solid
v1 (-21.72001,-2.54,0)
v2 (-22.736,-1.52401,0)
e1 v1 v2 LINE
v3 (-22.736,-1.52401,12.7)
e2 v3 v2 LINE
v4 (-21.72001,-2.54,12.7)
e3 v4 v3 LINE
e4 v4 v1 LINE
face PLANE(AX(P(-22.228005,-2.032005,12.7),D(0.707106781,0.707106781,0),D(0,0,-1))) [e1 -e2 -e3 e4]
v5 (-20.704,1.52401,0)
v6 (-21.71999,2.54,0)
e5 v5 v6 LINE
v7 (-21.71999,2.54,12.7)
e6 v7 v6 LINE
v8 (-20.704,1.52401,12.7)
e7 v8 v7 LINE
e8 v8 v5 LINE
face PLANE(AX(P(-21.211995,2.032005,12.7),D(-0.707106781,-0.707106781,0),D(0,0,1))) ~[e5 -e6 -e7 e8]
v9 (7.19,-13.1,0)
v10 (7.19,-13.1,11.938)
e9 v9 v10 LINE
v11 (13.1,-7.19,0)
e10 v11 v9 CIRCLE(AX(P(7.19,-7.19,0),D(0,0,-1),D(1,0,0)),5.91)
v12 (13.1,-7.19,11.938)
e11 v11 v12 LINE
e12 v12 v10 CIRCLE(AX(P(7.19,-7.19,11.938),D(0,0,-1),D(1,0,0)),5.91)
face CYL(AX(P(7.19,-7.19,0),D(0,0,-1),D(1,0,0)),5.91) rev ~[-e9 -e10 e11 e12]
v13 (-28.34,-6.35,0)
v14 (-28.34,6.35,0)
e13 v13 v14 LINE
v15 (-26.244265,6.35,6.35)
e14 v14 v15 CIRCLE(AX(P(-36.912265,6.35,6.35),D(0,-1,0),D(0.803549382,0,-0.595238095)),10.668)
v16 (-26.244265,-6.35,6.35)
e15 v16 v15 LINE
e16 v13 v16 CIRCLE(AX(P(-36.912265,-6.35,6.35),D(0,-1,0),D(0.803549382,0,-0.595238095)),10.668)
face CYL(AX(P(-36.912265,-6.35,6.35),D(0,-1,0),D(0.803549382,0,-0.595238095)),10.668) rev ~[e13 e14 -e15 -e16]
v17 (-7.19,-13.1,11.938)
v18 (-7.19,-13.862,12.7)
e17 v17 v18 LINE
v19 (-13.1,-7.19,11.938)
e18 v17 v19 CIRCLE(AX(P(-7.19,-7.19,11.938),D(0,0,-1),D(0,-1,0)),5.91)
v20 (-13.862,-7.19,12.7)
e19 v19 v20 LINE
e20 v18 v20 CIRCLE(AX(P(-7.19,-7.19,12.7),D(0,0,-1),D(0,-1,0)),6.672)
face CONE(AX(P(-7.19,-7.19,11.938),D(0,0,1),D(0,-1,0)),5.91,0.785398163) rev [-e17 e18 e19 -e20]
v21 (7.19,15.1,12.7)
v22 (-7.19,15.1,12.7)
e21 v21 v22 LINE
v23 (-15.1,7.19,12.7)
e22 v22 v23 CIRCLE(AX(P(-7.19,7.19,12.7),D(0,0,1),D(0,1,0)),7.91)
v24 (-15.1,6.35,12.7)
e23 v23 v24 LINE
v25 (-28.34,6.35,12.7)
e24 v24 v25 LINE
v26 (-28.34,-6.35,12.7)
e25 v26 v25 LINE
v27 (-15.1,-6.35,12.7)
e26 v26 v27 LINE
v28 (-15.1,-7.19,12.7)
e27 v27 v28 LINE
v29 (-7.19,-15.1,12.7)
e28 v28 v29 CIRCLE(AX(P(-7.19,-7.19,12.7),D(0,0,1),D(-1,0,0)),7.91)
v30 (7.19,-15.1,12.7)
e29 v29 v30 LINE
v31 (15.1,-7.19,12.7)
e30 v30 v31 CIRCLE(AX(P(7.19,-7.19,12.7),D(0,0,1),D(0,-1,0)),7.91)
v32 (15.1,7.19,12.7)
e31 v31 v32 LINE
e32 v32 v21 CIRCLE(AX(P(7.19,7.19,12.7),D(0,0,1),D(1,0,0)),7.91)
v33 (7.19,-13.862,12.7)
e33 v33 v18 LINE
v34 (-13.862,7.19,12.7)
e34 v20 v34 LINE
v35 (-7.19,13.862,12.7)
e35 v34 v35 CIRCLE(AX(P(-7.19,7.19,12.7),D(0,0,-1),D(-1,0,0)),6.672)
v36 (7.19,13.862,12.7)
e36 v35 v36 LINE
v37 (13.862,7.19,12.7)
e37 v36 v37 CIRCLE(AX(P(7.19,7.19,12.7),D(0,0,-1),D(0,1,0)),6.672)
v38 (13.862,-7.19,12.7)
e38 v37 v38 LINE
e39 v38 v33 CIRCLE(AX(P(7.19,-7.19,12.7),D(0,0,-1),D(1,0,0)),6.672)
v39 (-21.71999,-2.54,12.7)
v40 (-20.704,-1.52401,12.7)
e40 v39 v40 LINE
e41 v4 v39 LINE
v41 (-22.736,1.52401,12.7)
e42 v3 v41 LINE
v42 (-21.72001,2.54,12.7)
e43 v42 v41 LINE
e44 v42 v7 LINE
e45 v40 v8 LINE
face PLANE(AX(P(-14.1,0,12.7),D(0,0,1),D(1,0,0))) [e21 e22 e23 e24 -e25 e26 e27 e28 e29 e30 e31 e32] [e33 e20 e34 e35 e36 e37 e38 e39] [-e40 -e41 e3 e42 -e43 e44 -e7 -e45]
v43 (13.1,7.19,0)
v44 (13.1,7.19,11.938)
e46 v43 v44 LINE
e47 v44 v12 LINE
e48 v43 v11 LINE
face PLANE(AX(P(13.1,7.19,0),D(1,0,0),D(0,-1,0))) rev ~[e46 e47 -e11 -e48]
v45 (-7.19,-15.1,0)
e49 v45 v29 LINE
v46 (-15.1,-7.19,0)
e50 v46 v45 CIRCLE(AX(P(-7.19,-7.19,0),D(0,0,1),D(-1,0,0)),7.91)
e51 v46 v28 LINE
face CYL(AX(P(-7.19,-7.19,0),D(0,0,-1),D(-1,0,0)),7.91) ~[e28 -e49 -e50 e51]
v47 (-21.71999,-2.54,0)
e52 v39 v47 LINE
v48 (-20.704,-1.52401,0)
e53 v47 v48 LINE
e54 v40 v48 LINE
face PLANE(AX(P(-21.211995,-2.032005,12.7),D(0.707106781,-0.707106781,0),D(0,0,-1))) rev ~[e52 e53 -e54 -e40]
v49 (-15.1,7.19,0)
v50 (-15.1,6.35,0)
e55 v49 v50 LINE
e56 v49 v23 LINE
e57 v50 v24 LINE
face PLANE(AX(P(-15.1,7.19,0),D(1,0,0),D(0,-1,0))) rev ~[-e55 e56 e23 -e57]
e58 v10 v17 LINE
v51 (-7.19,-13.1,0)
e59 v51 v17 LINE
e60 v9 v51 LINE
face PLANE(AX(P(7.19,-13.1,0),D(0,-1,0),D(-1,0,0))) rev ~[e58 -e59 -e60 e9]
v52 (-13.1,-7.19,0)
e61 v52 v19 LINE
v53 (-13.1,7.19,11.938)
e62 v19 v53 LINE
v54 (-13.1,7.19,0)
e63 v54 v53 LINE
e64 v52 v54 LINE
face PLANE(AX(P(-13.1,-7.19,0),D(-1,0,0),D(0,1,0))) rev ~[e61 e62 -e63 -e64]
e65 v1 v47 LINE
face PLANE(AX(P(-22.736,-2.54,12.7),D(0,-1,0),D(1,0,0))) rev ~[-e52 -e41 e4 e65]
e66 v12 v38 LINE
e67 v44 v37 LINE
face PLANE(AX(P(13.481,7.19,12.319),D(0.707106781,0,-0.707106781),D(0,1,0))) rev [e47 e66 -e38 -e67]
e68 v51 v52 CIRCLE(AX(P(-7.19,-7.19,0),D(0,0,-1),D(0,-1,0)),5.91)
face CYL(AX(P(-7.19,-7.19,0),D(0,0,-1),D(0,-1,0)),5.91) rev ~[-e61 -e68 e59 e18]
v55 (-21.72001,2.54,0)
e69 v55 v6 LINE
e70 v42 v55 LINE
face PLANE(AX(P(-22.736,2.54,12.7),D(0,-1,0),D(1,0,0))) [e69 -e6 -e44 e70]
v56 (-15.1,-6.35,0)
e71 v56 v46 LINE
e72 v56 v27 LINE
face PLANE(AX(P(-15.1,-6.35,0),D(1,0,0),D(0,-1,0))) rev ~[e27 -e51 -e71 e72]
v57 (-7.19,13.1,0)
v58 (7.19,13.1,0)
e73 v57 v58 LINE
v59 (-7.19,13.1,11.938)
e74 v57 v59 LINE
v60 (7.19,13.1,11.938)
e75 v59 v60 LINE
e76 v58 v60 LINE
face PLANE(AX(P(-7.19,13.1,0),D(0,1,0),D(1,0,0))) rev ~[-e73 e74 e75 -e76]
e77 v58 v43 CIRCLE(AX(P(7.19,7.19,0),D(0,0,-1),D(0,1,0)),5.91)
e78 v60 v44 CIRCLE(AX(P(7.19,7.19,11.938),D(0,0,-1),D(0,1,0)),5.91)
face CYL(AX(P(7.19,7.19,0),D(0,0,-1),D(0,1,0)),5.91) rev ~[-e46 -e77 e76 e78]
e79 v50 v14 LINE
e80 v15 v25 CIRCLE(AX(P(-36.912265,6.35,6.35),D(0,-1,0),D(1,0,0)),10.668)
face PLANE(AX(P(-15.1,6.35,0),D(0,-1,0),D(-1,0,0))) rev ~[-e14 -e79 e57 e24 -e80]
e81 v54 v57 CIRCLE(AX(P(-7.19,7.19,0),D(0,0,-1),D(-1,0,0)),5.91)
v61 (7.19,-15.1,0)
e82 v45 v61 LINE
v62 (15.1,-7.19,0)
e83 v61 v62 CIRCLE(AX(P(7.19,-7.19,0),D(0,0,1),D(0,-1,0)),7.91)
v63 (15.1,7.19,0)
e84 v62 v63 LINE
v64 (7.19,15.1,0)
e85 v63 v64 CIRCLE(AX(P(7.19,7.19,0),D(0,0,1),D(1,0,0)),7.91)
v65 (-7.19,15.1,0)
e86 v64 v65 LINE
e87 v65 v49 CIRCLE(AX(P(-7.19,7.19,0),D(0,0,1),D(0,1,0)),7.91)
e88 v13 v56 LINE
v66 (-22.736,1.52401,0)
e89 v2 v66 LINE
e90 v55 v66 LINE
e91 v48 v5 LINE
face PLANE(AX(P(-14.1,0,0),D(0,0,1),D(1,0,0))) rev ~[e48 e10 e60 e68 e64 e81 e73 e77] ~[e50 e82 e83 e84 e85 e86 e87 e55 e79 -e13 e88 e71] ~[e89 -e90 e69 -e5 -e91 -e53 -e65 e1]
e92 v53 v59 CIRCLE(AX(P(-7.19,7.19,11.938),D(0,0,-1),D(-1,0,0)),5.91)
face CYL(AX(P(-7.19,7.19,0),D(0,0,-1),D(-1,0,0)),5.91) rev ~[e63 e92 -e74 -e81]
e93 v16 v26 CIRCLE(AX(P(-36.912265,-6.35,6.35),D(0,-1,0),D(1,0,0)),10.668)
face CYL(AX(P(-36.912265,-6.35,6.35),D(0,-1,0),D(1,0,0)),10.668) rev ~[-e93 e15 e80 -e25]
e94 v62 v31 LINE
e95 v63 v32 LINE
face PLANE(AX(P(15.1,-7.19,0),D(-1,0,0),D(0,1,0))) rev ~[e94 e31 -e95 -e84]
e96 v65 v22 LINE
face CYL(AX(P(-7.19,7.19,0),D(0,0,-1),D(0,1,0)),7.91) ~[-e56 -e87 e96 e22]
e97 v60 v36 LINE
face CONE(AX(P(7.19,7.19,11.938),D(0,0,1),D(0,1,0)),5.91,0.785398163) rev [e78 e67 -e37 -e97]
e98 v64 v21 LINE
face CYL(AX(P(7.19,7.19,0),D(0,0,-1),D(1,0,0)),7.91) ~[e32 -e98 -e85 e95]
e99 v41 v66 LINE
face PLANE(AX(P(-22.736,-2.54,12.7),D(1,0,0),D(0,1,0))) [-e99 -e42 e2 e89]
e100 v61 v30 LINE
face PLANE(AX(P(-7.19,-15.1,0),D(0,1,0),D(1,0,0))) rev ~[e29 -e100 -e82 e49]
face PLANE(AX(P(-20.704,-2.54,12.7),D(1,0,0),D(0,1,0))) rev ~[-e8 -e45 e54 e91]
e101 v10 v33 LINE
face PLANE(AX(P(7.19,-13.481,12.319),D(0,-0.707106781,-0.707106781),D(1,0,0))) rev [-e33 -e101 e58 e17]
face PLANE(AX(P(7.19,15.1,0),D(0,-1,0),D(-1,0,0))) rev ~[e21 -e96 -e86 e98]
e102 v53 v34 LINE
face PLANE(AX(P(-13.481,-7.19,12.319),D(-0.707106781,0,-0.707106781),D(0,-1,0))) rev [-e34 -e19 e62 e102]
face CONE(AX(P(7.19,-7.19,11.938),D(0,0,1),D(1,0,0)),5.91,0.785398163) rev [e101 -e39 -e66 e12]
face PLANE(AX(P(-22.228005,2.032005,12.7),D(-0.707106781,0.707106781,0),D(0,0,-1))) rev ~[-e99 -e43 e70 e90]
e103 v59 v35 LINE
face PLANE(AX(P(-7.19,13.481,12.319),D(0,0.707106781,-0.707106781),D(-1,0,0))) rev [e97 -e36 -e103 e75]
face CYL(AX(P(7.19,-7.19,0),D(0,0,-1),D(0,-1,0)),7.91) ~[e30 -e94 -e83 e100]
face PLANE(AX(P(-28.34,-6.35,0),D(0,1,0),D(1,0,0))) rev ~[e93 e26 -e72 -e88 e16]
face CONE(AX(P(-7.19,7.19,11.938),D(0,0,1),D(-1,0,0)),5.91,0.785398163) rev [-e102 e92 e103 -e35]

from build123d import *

# Parameters (mm, degrees)
F0_W     = 2
F0_H     = 12.7
F0_W_2   = 13.24
F1_DEPTH = 12.7
F3_DEPTH = 12.7
F4_W     = 2.032
F4_H     = 5.08
F5_DEPTH = 12.7
F6_SIZE  = 1.01599
F7_SIZE  = 0.762


# Not quite as in the source:
# - a fillet or chamfer is up to 0.001 mm smaller than in the source, because OpenCascade refuses the exact size


with BuildPart() as f1:
    # F0 (on Top) → F1 (new body)
    with BuildSketch(Plane.XY):
        with Locations((-14.1, 0)):
            Rectangle(F0_W, F0_H)
        with Locations((-21.72, 0)):
            Rectangle(F0_W_2, F0_H)
        with BuildLine():
            ThreePointArc((7.19, 13.1), (11.3690010768, 11.3690010768), (13.1, 7.19))
            Line((13.1, 7.19), (13.1, -7.19))
            ThreePointArc((13.1, -7.19), (11.3690010768, -11.3690010768), (7.19, -13.1))
            Line((7.19, -13.1), (-7.19, -13.1))
            ThreePointArc((-7.19, -13.1), (-11.3690010768, -11.3690010768), (-13.1, -7.19))
            Line((-13.1, -7.19), (-13.1, -6.35))
            Line((-13.1, -6.35), (-15.1, -6.35))
            Line((-15.1, -6.35), (-15.1, -7.19))
            ThreePointArc((-15.1, -7.19), (-12.7832146392, -12.7832146392), (-7.19, -15.1))
            Line((-7.19, -15.1), (7.19, -15.1))
            ThreePointArc((7.19, -15.1), (12.7832146392, -12.7832146392), (15.1, -7.19))
            Line((15.1, -7.19), (15.1, 7.19))
            ThreePointArc((15.1, 7.19), (12.7832146392, 12.7832146392), (7.19, 15.1))
            Line((7.19, 15.1), (-7.19, 15.1))
            ThreePointArc((-7.19, 15.1), (-12.7832146392, 12.7832146392), (-15.1, 7.19))
            Line((-15.1, 7.19), (-15.1, 6.35))
            Line((-15.1, 6.35), (-13.1, 6.35))
            Line((-13.1, 6.35), (-13.1, 7.19))
            ThreePointArc((-13.1, 7.19), (-11.3690010768, 11.3690010768), (-7.19, 13.1))
            Line((-7.19, 13.1), (7.19, 13.1))
        make_face()
    extrude(amount=F1_DEPTH)

    # F2 (on face) → F3 (cut, through all)
    with BuildSketch(Plane.XZ.offset(6.35)):
        with BuildLine():
            ThreePointArc((-28.34, 0), (-26.7817380481, 3.0065509582), (-26.2442648116, 6.35))
            ThreePointArc((-26.2442648116, 6.35), (-26.7817380481, 9.6934490418), (-28.34, 12.7))
            Line((-28.34, 12.7), (-28.34, 0))
        make_face()
    extrude(amount=-F3_DEPTH, mode=Mode.SUBTRACT)

    # F4 (on face) → F5 (cut, through all)
    with BuildSketch(Plane.XY.offset(12.7)):
        with Locations((-21.72, 0)):
            Rectangle(F4_W, F4_H)
    extrude(amount=-F5_DEPTH, mode=Mode.SUBTRACT)

    # F6 (size 1.016 in the source; OpenCascade refuses exactly that, so slightly less here)
    f6_edges = [f1.edges().sort_by_distance(p)[0] for p in [
        (-22.736, -2.54, 6.35),
        (-20.704, -2.54, 6.35),
        (-20.704, 2.54, 6.35),
        (-22.736, 2.54, 6.35),
    ]]
    chamfer(f6_edges, length=F6_SIZE)

    # F7
    f7_edges = [f1.edges().sort_by_distance(p)[0] for p in [
        (-11.369001, -11.369001, 12.7),
        (0, -13.1, 12.7),
        (-13.1, 0, 12.7),
        (-11.369001, 11.369001, 12.7),
        (0, 13.1, 12.7),
        (11.369001, 11.369001, 12.7),
        (13.1, 0, 12.7),
        (11.369001, -11.369001, 12.7),
    ]]
    chamfer(f7_edges, length=F7_SIZE)


solid = f1.part
